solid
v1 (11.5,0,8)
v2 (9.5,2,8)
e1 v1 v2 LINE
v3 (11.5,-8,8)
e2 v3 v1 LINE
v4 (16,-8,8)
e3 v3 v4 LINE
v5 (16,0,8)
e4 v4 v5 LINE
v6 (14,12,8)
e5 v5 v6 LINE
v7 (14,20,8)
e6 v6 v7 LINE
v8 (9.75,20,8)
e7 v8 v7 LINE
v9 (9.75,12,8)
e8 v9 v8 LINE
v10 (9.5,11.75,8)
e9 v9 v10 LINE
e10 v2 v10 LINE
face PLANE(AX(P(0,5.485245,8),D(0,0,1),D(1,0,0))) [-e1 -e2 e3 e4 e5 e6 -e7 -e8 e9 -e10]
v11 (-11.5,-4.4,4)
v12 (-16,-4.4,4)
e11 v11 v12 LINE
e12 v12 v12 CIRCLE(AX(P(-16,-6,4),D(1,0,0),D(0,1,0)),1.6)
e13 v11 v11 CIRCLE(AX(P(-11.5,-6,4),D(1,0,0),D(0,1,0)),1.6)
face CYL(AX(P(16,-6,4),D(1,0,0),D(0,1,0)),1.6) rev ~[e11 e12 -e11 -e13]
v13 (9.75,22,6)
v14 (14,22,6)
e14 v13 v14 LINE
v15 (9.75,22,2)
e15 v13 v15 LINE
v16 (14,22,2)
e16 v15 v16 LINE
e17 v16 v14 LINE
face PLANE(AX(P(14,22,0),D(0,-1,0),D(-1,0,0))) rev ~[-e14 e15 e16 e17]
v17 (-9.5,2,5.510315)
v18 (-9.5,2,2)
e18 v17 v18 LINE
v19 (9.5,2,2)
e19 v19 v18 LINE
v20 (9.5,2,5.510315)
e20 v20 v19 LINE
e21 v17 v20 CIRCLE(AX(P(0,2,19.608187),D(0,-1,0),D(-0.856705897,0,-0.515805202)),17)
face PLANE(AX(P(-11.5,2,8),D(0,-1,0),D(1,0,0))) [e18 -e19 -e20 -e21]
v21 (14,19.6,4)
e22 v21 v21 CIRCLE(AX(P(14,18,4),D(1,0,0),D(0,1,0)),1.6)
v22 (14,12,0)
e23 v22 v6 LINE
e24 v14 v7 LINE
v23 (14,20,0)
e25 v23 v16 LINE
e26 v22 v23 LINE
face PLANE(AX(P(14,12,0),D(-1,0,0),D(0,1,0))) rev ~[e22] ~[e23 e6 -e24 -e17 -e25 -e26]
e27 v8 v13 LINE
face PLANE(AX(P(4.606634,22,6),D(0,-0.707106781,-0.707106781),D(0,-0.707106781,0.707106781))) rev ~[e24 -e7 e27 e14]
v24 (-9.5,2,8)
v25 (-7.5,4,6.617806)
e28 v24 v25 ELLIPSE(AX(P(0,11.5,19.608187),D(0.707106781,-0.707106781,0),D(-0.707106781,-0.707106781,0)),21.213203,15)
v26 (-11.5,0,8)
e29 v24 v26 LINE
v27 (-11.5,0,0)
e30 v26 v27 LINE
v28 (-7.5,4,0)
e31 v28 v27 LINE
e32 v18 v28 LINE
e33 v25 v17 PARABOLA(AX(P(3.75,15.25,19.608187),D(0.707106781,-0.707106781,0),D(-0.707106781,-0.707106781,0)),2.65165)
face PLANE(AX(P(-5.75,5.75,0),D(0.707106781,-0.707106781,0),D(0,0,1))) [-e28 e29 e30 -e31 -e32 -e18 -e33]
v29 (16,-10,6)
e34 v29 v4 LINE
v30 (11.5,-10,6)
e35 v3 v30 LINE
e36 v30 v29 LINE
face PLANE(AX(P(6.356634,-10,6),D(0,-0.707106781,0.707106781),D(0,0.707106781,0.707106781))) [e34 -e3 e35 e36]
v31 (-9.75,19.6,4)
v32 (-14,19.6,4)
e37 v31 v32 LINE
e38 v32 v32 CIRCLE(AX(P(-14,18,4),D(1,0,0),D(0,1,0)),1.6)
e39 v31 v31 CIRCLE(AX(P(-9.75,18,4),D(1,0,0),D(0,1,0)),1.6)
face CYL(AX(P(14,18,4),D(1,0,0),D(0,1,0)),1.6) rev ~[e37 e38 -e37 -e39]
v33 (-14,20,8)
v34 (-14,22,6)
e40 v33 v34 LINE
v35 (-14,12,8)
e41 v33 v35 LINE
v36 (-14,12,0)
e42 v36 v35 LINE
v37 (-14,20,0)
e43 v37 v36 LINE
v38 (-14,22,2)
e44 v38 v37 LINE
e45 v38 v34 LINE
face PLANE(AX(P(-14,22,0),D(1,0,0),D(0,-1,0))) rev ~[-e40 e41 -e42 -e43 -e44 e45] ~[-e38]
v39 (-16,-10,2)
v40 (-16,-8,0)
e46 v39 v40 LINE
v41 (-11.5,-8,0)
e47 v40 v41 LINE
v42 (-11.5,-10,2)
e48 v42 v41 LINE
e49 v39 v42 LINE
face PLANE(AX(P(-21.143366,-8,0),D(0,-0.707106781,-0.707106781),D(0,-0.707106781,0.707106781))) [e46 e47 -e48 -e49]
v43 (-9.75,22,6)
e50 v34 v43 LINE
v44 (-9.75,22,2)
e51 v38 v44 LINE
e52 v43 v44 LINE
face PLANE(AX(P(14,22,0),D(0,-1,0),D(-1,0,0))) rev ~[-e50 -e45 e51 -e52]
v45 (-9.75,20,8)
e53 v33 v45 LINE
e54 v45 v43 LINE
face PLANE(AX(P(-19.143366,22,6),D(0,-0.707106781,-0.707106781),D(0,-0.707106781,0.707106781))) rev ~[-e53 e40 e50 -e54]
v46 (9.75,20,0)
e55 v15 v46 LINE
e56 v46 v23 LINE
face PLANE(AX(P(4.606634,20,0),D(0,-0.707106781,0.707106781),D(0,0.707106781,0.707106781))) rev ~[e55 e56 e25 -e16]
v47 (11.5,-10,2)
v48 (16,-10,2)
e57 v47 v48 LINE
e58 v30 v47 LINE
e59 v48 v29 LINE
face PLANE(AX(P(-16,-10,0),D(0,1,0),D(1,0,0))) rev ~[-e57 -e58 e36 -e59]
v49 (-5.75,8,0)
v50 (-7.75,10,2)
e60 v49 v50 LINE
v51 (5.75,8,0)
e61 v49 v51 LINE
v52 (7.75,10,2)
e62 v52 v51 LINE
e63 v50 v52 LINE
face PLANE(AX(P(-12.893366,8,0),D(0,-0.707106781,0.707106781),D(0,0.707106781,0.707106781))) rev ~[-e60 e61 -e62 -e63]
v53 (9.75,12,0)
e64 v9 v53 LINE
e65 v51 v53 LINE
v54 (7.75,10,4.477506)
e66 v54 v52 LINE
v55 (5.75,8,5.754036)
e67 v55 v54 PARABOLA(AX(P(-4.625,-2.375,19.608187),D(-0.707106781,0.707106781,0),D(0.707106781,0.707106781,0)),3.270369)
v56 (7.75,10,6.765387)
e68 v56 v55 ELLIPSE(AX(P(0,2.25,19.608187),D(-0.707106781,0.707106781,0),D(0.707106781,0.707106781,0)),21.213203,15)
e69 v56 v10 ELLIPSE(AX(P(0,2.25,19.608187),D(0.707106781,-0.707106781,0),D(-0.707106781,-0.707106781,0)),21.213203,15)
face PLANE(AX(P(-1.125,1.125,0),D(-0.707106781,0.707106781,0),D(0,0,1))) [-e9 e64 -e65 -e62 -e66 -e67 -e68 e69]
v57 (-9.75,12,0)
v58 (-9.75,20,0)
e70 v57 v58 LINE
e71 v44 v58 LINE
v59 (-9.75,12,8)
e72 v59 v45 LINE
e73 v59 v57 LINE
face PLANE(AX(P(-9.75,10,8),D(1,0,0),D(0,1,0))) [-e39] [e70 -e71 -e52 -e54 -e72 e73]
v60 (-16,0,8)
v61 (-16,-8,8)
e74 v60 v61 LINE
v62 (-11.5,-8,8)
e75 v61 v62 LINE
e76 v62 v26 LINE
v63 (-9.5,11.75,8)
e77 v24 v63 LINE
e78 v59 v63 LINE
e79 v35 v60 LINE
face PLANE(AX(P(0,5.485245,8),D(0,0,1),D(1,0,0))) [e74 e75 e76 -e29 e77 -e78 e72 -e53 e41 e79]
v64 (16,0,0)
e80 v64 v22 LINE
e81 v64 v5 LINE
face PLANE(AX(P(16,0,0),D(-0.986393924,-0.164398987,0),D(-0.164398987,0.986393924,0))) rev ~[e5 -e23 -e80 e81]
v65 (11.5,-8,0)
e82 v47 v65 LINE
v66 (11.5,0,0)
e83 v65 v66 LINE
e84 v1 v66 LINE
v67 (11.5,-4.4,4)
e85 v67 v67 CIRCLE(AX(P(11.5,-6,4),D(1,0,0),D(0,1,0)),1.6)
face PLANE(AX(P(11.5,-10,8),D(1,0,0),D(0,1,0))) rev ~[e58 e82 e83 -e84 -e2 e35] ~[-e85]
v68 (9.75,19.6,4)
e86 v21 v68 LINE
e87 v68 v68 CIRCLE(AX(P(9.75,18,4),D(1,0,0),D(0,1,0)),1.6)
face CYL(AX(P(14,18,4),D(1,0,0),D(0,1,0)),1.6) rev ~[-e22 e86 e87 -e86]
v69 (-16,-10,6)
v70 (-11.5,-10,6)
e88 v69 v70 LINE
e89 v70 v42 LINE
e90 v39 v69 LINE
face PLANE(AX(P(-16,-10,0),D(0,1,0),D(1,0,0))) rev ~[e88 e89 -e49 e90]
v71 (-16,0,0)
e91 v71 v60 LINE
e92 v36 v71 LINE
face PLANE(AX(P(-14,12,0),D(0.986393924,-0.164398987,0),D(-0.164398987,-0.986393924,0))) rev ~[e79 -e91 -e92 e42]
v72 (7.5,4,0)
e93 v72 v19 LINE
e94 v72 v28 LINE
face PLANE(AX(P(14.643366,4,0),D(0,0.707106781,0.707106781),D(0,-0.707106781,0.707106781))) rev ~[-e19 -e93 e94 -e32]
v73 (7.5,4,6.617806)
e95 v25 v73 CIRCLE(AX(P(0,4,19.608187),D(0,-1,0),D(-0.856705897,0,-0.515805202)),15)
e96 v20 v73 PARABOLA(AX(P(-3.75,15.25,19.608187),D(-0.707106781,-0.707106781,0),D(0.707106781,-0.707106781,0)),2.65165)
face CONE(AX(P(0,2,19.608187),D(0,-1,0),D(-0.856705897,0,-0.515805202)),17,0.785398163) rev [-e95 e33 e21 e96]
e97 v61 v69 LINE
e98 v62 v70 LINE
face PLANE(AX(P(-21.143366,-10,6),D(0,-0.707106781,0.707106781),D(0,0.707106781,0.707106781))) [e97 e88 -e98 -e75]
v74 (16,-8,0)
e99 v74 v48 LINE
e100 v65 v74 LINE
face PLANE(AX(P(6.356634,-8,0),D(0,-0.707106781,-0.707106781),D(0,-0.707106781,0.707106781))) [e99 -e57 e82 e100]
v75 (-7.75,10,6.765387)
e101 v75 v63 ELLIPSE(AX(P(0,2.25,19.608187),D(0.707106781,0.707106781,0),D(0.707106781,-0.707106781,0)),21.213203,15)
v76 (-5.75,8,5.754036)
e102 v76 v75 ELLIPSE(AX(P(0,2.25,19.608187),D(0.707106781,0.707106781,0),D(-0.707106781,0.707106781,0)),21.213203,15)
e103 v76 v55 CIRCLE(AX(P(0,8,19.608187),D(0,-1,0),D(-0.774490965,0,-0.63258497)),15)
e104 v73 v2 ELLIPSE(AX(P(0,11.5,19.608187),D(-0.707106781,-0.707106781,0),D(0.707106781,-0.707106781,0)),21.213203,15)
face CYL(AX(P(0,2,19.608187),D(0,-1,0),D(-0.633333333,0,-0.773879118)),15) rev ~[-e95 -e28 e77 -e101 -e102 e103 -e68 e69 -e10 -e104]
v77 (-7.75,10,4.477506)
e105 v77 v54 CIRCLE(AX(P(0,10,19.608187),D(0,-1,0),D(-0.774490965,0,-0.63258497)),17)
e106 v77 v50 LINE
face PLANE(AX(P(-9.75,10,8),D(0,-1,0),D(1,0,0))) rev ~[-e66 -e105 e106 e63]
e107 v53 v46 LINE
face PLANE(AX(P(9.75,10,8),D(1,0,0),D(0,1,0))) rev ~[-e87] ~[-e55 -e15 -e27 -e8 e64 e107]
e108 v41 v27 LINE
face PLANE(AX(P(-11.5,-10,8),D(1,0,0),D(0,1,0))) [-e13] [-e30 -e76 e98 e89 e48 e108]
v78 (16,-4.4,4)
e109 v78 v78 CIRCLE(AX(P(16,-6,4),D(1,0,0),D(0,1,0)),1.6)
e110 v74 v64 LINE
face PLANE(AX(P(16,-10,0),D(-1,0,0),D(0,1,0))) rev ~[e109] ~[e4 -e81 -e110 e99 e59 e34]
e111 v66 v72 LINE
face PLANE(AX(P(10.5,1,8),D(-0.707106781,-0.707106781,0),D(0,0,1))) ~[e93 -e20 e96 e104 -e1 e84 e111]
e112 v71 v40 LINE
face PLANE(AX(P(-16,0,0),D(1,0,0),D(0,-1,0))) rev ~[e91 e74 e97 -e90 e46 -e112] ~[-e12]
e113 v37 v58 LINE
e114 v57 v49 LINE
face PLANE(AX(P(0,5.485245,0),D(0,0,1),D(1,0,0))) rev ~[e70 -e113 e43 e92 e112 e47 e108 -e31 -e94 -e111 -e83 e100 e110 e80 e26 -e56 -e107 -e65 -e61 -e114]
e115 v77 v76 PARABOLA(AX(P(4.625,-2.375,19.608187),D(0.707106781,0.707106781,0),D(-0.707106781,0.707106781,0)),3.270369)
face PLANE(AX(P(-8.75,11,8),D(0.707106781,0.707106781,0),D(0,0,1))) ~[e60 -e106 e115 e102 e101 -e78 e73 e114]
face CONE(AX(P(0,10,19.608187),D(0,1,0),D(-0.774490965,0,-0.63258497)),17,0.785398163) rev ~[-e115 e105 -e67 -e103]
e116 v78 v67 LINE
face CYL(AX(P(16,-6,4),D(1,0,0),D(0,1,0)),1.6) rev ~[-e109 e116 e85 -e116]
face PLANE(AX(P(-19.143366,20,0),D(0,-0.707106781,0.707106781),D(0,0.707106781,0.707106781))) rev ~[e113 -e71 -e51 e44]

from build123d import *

# Parameters (mm, degrees)
F1_DEPTH      = 8
F2_W          = 19.5
F2_H          = 12
F2_W_2        = 23
F3_DEPTH      = 8
F4_R          = 1.6
F5_DEPTH      = 32
F6_R          = 1.6
F7_DEPTH      = 28
F8_SIZE       = 2
F10_DEPTH     = 9.751
F11_T1_DEPTH  = 14.7867319519
F11_T3_DEPTH  = 14.7867319519
F11_T5_DEPTH  = 14.5367319519
F11_T7_DEPTH  = 14.5367319519
F11_T12_DEPTH = 25.7867319519
F11_T18_DEPTH = 29.2867319519
F11_T24_ANGLE = 117.8974179381
F11_T30_ANGLE = 101.5178089871


# Not quite as in the source:
# - a fillet or chamfer that OpenCascade refuses, or shapes differently, is made with other operations: its cross-section is extruded or revolved along the edge and cut away or added


with BuildPart() as f1:
    # F0 (on Top) → F1 (new body)
    with BuildSketch(Plane.XY):
        Polygon((14, 22), (-14, 22), (-14, 12), (-16, 0), (-16, -10), (16, -10), (16, 0), (14, 12), align=None)
    extrude(amount=F1_DEPTH)

    # F2 (on face) → F3 (cut, through all)
    with BuildSketch(Plane.XY.offset(8)):
        with Locations((0, 16)):
            Rectangle(F2_W, F2_H)
        with Locations((0, -4)):
            Rectangle(F2_W_2, F2_H)
    extrude(amount=-F3_DEPTH, mode=Mode.SUBTRACT)

    # F4 (on face) → F5 (cut, through all)
    with BuildSketch(Plane.YZ.offset(16)):
        with Locations((-6, 4)):
            Circle(F4_R)
    extrude(amount=-F5_DEPTH, mode=Mode.SUBTRACT)

    # F6 (on face) → F7 (cut, through all)
    with BuildSketch(Plane.YZ.offset(14)):
        with Locations((18, 4)):
            Circle(F6_R)
    extrude(amount=-F7_DEPTH, mode=Mode.SUBTRACT)

    # F8
    f8_edges = [f1.edges().sort_by_distance(p)[0] for p in [
        (9.75, 10, 4),
        (-9.75, 10, 4),
        (11.5, 2, 4),
        (-11.5, 2, 4),
    ]]
    chamfer(f8_edges, length=F8_SIZE)

    # F9 (on face) → F10 (cut, through all)
    with BuildSketch(Plane.XZ.offset(-2)):
        with BuildLine():
            Line((9.5, 8), (-9.5, 8))
            ThreePointArc((-9.5, 8), (0, 4.6081867662), (9.5, 8))
        make_face()
    extrude(amount=-F10_DEPTH, mode=Mode.SUBTRACT)

    # F11: chamfer of 2 on 12 edges, made by hand

    # F11_s2 → F11_t1 (cut)
    with BuildSketch(Plane.YZ.offset(-21.1433659759)):
        Polygon((-10, 6), (-8, 8), (-10, 8), align=None)
        Polygon((-8, 0), (-10, 2), (-10, 0), align=None)
    extrude(amount=F11_T1_DEPTH, mode=Mode.SUBTRACT)

    # F11_s4 → F11_t3 (cut)
    with BuildSketch(Plane.YZ.offset(6.3566340241)):
        Polygon((-10, 6), (-8, 8), (-10, 8), align=None)
        Polygon((-8, 0), (-10, 2), (-10, 0), align=None)
    extrude(amount=F11_T3_DEPTH, mode=Mode.SUBTRACT)

    # F11_s6 → F11_t5 (cut)
    with BuildSketch(Plane.YZ.offset(4.6066340241)):
        Polygon((22, 6), (20, 8), (22, 8), align=None)
        Polygon((20, 0), (22, 2), (22, 0), align=None)
    extrude(amount=F11_T5_DEPTH, mode=Mode.SUBTRACT)

    # F11_s8 → F11_t7 (cut)
    with BuildSketch(Plane.YZ.offset(-19.1433659759)):
        Polygon((20, 0), (22, 2), (22, 0), align=None)
        Polygon((22, 6), (20, 8), (22, 8), align=None)
    extrude(amount=F11_T7_DEPTH, mode=Mode.SUBTRACT)


with BuildPart() as f11_tool10:
    # F11_s11 → F11_t12 (new body)
    with BuildSketch(Plane.YZ.offset(-12.8933659759)):
        Polygon((8, 0), (10, 2), (10, 0), align=None)
    extrude(amount=F11_T12_DEPTH)

    split(bisect_by=Plane(origin=(-1.125, 1.125, 0), x_dir=(0, 0, 1), z_dir=(-0.7071067812, 0.7071067812, 0)), keep=Keep.TOP)

    split(bisect_by=Plane(origin=(1.125, 1.125, 0), x_dir=(0, 0, 1), z_dir=(0.7071067812, 0.7071067812, 0)), keep=Keep.TOP)


with BuildPart() as f1_1:
    add(f1.part)

    # F11_t9: cut F11_tool10
    add(f11_tool10.part, mode=Mode.SUBTRACT)


with BuildPart() as f11_tool16:
    # F11_s17 → F11_t18 (new body)
    with BuildSketch(Plane.YZ.offset(14.6433659759)):
        Polygon((4, 0), (2, 2), (2, 0), align=None)
    extrude(amount=-F11_T18_DEPTH)

    split(bisect_by=Plane(origin=(5.75, 5.75, 0), x_dir=(0, 0, 1), z_dir=(-0.7071067812, -0.7071067812, 0)), keep=Keep.TOP)

    split(bisect_by=Plane(origin=(-5.75, 5.75, 0), x_dir=(0, 0, 1), z_dir=(0.7071067812, -0.7071067812, 0)), keep=Keep.TOP)


with BuildPart() as f1_2:
    add(f1_1.part)

    # F11_t15: cut F11_tool16
    add(f11_tool16.part, mode=Mode.SUBTRACT)


with BuildPart() as f11_tool22:
    # F11_s23 → F11_t24 (revolve)
    with BuildSketch(Plane(origin=(-8.664727501, 0, 14.3913305034), x_dir=(0, 1, 0), z_dir=(-0.5158052023, 0, 0.8567058966))):
        Polygon((2, 6.8859952574), (4, 4.8859952574), (2, 4.8859952574), align=None)
    revolve(axis=Axis((0, 2, 19.6081867662), (0, -1, 0)), revolution_arc=F11_T24_ANGLE)

    split(bisect_by=Plane(origin=(5.75, 5.75, 0), x_dir=(0, 0, 1), z_dir=(-0.7071067812, -0.7071067812, 0)), keep=Keep.TOP)

    split(bisect_by=Plane(origin=(-5.75, 5.75, 0), x_dir=(0, 0, 1), z_dir=(0.7071067812, -0.7071067812, 0)), keep=Keep.TOP)


with BuildPart() as f1_3:
    add(f1_2.part)

    # F11_t21: cut F11_tool22
    add(f11_tool22.part, mode=Mode.SUBTRACT)


with BuildPart() as f11_tool28:
    # F11_s29 → F11_t30 (revolve)
    with BuildSketch(Plane(origin=(-9.6066653022, 0, 11.7617013204), x_dir=(0, 1, 0), z_dir=(-0.6325849704, 0, 0.7744909652))):
        Polygon((10, 4.596155754), (8, 2.596155754), (10, 2.596155754), align=None)
    revolve(axis=Axis((0, 10, 19.6081867662), (0, -1, 0)), revolution_arc=F11_T30_ANGLE)

    split(bisect_by=Plane(origin=(-1.125, 1.125, 0), x_dir=(0, 0, 1), z_dir=(-0.7071067812, 0.7071067812, 0)), keep=Keep.TOP)

    split(bisect_by=Plane(origin=(1.125, 1.125, 0), x_dir=(0, 0, 1), z_dir=(0.7071067812, 0.7071067812, 0)), keep=Keep.TOP)


with BuildPart() as f1_4:
    add(f1_3.part)

    # F11_t27: cut F11_tool28
    add(f11_tool28.part, mode=Mode.SUBTRACT)


solid = f1_4.part
